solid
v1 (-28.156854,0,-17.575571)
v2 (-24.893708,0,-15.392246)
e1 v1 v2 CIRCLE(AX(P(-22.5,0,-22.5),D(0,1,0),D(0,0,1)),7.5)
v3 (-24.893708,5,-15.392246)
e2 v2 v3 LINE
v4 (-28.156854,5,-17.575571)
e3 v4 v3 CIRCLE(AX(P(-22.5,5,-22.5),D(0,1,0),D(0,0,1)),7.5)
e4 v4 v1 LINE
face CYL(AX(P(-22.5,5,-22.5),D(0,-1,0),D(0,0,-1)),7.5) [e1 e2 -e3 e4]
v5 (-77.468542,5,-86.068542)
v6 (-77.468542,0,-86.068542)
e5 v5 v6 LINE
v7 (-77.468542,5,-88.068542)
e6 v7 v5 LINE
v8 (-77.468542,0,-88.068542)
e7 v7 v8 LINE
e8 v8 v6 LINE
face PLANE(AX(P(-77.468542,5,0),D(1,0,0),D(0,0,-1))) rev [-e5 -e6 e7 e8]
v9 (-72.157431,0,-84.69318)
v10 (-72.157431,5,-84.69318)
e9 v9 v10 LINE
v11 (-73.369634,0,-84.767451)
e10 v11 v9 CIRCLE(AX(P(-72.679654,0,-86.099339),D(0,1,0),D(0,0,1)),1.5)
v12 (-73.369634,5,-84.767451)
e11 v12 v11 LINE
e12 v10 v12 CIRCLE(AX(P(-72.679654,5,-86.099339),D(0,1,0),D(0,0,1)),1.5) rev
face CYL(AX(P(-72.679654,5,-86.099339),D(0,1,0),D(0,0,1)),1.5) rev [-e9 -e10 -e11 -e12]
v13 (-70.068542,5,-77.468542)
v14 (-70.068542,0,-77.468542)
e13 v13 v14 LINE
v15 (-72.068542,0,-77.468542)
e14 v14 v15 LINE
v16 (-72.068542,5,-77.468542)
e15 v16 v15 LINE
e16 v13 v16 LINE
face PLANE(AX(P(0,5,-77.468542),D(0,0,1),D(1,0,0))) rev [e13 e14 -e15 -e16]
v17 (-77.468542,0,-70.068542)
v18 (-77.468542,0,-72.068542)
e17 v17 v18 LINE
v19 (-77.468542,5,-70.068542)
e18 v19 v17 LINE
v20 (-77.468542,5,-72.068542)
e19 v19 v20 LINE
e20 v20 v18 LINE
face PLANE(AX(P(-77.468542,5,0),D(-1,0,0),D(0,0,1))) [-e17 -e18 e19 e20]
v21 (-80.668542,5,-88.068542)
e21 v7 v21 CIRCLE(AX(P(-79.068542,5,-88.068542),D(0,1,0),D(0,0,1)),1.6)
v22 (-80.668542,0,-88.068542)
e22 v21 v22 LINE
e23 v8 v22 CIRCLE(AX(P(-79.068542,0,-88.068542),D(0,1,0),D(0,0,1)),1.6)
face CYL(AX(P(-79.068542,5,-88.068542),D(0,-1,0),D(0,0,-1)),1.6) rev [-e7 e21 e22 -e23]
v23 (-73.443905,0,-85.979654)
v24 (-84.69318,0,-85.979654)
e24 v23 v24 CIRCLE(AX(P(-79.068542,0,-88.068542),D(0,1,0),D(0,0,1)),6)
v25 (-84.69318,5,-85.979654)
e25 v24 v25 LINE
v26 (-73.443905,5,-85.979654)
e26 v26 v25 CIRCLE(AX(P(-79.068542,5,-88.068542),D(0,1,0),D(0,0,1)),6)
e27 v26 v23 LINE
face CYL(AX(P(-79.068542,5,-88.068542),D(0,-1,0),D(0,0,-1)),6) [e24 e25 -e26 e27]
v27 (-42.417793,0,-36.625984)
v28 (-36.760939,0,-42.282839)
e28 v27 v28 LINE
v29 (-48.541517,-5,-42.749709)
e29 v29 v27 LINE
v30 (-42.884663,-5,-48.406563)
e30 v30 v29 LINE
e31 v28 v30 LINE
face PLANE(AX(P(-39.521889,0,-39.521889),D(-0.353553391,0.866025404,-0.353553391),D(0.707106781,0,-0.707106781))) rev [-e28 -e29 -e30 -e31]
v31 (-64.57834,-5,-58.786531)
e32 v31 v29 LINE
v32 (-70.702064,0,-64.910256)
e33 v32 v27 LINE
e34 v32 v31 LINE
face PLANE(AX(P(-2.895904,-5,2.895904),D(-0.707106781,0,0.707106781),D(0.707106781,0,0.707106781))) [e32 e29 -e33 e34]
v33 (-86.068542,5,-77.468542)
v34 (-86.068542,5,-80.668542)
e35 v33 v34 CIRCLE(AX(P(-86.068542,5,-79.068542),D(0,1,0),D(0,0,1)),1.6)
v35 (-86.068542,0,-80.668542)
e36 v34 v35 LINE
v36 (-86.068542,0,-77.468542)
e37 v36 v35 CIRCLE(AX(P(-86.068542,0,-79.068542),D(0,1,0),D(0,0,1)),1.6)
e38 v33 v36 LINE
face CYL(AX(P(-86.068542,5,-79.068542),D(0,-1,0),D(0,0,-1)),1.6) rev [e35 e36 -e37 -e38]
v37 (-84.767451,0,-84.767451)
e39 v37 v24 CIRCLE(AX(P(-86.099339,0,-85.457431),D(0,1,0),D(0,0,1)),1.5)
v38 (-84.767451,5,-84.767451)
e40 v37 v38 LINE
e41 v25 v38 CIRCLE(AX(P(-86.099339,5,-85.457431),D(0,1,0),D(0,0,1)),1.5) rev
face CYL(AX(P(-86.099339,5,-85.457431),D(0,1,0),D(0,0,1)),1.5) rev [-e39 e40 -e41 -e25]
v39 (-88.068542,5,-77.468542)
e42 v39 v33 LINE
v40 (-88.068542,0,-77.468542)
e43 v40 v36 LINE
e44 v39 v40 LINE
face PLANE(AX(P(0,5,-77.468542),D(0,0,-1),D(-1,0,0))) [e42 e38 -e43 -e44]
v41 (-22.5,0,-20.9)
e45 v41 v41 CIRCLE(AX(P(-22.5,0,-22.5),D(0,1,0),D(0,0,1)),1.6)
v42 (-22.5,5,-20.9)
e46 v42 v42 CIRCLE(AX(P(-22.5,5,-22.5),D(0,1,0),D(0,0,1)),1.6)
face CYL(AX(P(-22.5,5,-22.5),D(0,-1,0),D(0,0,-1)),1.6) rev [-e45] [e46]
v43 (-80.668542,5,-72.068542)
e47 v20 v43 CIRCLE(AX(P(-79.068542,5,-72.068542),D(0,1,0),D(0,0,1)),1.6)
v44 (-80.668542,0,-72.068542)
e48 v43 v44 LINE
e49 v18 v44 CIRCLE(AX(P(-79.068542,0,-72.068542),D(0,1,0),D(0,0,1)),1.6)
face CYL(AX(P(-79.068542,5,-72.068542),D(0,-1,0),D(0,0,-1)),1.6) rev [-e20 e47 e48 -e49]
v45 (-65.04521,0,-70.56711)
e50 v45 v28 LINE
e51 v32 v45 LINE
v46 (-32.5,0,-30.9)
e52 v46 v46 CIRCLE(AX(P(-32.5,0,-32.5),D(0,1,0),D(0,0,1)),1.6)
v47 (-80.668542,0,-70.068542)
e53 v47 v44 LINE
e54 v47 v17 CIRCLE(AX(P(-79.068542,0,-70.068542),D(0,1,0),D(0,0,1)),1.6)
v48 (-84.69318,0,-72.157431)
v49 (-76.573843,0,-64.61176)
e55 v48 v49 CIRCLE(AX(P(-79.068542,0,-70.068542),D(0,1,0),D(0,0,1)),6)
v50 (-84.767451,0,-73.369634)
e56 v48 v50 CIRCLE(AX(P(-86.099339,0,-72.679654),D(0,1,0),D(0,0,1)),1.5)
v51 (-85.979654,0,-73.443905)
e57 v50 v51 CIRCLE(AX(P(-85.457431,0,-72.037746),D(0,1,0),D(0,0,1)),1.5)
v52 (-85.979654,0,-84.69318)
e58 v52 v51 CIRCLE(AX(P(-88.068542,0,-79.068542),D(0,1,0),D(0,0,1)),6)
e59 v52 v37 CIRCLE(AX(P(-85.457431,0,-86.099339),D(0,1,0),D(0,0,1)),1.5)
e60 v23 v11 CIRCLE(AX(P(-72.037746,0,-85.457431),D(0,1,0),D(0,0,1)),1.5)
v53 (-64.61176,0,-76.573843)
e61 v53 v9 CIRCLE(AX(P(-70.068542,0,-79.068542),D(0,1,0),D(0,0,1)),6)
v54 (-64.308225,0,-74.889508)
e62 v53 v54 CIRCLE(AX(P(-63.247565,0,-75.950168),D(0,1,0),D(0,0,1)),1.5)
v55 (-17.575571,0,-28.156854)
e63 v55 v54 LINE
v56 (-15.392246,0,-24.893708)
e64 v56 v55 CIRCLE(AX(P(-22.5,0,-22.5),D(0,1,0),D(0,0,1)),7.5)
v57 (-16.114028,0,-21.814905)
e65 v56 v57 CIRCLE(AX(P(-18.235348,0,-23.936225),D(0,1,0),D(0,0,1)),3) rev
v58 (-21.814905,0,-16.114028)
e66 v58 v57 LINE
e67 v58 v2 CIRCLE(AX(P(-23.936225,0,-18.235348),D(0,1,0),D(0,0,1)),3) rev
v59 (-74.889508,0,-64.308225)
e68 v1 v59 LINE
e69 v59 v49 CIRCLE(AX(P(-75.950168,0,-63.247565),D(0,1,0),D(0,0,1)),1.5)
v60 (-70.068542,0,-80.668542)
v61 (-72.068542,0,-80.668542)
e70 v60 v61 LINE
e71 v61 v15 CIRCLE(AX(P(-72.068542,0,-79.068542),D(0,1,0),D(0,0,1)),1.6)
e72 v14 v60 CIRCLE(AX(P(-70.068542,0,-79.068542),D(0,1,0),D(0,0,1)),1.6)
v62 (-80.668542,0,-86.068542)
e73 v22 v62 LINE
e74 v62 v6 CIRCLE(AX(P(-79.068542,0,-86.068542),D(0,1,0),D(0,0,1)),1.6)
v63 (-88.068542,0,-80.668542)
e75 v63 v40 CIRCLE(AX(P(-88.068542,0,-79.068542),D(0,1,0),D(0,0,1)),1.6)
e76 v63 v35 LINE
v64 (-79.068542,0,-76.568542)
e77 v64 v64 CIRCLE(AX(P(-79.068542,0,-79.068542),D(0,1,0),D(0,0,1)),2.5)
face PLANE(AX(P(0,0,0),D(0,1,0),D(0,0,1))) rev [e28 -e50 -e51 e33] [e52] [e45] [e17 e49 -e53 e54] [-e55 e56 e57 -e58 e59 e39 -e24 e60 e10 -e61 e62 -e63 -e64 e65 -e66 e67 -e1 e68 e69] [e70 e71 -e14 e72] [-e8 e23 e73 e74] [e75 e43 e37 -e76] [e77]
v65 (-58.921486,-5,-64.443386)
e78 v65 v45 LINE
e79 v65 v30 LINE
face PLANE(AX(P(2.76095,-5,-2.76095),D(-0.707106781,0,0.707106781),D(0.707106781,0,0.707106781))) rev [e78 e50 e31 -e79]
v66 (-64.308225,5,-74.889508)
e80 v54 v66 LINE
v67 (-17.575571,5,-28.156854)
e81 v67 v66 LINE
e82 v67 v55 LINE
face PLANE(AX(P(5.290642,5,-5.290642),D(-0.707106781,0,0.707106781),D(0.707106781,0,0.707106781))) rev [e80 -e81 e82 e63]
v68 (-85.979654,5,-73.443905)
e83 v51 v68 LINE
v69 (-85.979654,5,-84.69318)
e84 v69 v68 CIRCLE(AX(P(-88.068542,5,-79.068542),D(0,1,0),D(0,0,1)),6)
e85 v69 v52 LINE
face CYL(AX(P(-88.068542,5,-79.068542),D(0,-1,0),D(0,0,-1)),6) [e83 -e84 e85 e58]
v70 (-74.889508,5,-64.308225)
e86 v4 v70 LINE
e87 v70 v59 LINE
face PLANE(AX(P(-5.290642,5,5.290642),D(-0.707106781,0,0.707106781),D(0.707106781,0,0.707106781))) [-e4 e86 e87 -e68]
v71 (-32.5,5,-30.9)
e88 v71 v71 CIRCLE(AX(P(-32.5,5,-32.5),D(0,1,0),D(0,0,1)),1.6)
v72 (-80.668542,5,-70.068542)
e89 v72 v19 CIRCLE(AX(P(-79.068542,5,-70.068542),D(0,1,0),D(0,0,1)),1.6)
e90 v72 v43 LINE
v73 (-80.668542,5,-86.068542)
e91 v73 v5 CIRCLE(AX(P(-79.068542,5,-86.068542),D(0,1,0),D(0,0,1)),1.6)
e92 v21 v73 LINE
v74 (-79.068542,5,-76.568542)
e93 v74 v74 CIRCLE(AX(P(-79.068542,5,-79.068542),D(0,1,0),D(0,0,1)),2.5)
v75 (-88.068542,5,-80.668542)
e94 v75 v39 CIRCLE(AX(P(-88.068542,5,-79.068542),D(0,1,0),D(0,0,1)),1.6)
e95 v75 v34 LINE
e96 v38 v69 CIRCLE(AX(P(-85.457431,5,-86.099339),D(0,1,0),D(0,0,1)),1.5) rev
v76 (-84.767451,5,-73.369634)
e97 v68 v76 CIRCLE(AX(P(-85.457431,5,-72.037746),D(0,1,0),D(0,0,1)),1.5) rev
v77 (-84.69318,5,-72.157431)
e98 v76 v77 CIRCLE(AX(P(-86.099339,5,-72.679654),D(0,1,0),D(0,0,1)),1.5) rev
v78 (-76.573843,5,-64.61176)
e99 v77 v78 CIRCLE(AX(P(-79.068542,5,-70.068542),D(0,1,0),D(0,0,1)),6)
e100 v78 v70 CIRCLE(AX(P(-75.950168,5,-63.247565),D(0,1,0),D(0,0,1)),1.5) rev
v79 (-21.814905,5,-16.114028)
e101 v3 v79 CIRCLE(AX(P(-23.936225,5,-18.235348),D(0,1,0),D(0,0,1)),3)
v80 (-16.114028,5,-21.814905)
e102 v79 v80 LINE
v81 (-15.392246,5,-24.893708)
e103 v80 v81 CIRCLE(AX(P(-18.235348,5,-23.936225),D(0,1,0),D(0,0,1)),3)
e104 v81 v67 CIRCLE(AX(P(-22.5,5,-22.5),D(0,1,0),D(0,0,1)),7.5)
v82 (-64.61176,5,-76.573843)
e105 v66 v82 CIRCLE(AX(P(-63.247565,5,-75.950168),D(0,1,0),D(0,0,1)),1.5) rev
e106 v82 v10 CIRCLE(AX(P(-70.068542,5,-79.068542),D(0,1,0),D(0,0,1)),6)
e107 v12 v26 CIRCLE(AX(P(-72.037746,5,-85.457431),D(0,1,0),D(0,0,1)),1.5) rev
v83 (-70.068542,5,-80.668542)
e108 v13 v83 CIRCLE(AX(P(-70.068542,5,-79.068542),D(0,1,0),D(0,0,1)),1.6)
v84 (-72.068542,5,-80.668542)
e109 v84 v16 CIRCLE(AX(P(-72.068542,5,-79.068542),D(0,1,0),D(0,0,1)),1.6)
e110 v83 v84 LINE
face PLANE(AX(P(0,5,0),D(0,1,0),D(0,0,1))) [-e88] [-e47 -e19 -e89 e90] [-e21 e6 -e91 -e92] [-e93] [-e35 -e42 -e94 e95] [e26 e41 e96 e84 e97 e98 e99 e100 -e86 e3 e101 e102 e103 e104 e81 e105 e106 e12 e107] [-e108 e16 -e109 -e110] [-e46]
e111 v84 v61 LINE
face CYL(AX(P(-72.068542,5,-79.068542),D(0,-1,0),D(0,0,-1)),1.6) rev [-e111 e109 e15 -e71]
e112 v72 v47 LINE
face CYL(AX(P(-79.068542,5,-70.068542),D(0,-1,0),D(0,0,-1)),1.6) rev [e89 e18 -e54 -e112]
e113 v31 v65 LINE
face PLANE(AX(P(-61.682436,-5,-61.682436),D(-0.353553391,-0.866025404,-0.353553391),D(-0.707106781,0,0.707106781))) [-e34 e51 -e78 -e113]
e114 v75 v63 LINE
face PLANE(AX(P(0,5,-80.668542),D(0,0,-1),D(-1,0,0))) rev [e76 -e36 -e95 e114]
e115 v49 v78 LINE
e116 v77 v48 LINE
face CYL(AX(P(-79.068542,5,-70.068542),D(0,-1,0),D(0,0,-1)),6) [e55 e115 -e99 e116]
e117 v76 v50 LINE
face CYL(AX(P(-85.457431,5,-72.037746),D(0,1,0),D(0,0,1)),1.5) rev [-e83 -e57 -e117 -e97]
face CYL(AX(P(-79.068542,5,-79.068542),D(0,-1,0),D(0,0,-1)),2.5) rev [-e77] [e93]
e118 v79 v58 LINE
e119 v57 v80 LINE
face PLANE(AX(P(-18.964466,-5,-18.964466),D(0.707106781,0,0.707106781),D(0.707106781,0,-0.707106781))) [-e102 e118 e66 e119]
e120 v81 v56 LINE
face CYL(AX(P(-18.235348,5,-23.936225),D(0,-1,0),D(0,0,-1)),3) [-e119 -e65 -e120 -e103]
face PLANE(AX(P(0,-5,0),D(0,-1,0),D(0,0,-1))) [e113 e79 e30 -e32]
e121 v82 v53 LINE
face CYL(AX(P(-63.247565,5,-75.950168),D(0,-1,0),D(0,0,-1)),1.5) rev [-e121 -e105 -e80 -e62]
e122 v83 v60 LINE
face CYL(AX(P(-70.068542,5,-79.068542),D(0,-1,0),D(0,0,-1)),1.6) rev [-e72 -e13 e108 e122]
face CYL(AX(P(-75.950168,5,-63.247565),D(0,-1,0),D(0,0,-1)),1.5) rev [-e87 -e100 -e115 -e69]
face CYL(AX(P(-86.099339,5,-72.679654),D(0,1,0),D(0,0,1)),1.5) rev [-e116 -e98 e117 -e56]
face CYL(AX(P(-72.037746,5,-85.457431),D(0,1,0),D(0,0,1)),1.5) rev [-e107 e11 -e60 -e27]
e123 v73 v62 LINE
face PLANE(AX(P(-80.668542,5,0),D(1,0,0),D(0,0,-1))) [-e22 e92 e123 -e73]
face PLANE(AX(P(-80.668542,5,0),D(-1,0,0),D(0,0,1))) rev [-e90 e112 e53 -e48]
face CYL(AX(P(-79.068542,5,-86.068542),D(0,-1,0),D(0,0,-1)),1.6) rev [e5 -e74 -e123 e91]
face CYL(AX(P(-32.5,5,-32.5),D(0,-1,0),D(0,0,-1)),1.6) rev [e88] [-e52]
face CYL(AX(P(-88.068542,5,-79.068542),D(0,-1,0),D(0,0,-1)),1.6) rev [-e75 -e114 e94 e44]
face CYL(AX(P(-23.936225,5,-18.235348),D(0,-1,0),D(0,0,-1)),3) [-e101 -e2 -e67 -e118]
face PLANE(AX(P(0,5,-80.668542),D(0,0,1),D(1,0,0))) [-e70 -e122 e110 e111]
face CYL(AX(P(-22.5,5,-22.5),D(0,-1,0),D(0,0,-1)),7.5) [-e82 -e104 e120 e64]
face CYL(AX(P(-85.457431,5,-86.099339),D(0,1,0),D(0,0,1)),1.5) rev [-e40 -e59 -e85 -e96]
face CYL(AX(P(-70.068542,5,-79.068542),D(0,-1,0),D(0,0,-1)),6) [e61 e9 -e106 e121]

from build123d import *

# Parameters (mm, degrees)
SKETCH1_R           = 1.6
SKETCH1_R_2         = 2.5
BOSS_EXTRUDE1_DEPTH = 5
FILLET1_R           = 1.5
CUT_EXTRUDE1_START  = -10
CUT_EXTRUDE1_DEPTH  = 10
FILLET2_R           = 3
BOSS_EXTRUDE2_DEPTH = 5
CHAMFER1_SIZE2      = 8.660254038
CHAMFER1_SIZE       = 5
CHAMFER2_SIZE2      = 5
CHAMFER2_SIZE       = 8.660254038


# Some blends are built 0.0001 mm under size
with BuildPart() as part:
    # Sketch1 → Boss-Extrude1 (new body)
    with BuildSketch(Plane(origin=(0, 0, 0), x_dir=(1, 0, 0), z_dir=(0, 1, 0))):
        with BuildLine():
            ThreePointArc((-85.12409805, 73.840708631), (-84.725396744, 73.411688245), (-84.296376359, 73.012986939))
            ThreePointArc((-84.296376359, 73.012986939), (-83.127079594, 65.649461526), (-75.690864757, 65.109581606))
            Line((-75.690864757, 65.109581606), (-28.156854249, 17.575571099))
            ThreePointArc((-28.156854249, 17.575571099), (-17.196699141, 17.196699141), (-17.575571099, 28.156854249))
            Line((-17.575571099, 28.156854249), (-65.109581606, 75.690864757))
            ThreePointArc((-65.109581606, 75.690864757), (-65.649461526, 83.127079594), (-73.012986939, 84.296376359))
            ThreePointArc((-73.012986939, 84.296376359), (-73.411688245, 84.725396744), (-73.840708631, 85.12409805))
            ThreePointArc((-73.840708631, 85.12409805), (-79.068542495, 94.068542495), (-84.296376359, 85.12409805))
            ThreePointArc((-84.296376359, 85.12409805), (-84.725396744, 84.725396744), (-85.12409805, 84.296376359))
            ThreePointArc((-85.12409805, 84.296376359), (-94.068542495, 79.068542495), (-85.12409805, 73.840708631))
        make_face()
        with BuildLine():
            Line((-80.668542495, 86.068542495), (-80.668542495, 88.068542495))
            ThreePointArc((-80.668542495, 88.068542495), (-79.068542495, 89.668542495), (-77.468542495, 88.068542495))
            Line((-77.468542495, 88.068542495), (-77.468542495, 86.068542495))
            ThreePointArc((-77.468542495, 86.068542495), (-79.068542495, 84.468542495), (-80.668542495, 86.068542495))
        make_face(mode=Mode.SUBTRACT)
        with Locations(Location((-22.5, 22.5, 0), (0, 0, 270))):
            Circle(SKETCH1_R, mode=Mode.SUBTRACT)
        with Locations(Location((-32.5, 32.5, 0), (0, 0, 270))):
            Circle(SKETCH1_R, mode=Mode.SUBTRACT)
        with BuildLine():
            Line((-80.668542495, 70.068542495), (-80.668542495, 72.068542495))
            ThreePointArc((-80.668542495, 72.068542495), (-79.068542495, 73.668542495), (-77.468542495, 72.068542495))
            Line((-77.468542495, 72.068542495), (-77.468542495, 70.068542495))
            ThreePointArc((-77.468542495, 70.068542495), (-79.068542495, 68.468542495), (-80.668542495, 70.068542495))
        make_face(mode=Mode.SUBTRACT)
        with BuildLine():
            Line((-86.068542495, 77.468542495), (-88.068542495, 77.468542495))
            ThreePointArc((-88.068542495, 77.468542495), (-89.668542495, 79.068542495), (-88.068542495, 80.668542495))
            Line((-88.068542495, 80.668542495), (-86.068542495, 80.668542495))
            ThreePointArc((-86.068542495, 80.668542495), (-84.468542495, 79.068542495), (-86.068542495, 77.468542495))
        make_face(mode=Mode.SUBTRACT)
        with Locations(Location((-79.068542495, 79.068542495, 0), (0, 0, 270))):
            Circle(SKETCH1_R_2, mode=Mode.SUBTRACT)
        with BuildLine():
            ThreePointArc((-70.068542495, 80.668542495), (-68.468542495, 79.068542495), (-70.068542495, 77.468542495))
            Line((-70.068542495, 77.468542495), (-72.068542495, 77.468542495))
            ThreePointArc((-72.068542495, 77.468542495), (-73.668542495, 79.068542495), (-72.068542495, 80.668542495))
            Line((-72.068542495, 80.668542495), (-70.068542495, 80.668542495))
        make_face(mode=Mode.SUBTRACT)
    extrude(amount=BOSS_EXTRUDE1_DEPTH)

    # Fillet1
    # the kernel refuses this fillet: 1.5 mm, written as the material it adds along each edge
    with BuildSketch(Plane(origin=(-75.690864757, 0, -65.109581606), x_dir=(-0.8710919006324759, 0, 0.4911200470887958), z_dir=(0, 1, 0))) as fillet1_piece_1:
        with BuildLine():
            CenterArc((1.140350885, 1.494638979), FILLET1_R, 195.585774364, 69.56865207)
            Line((-0.304493073, 1.091617967), (0, 0))
            ThreePointArc((0, 0), (0.506822616, 0.021444084), (1.013645231, 0))
        make_face()
    extrude(amount=5)
    with BuildSketch(Plane(origin=(-65.109581606, 0, -75.690864757), x_dir=(0.70710678118656, 0, 0.7071067811865349), z_dir=(0, 1, 0))) as fillet1_piece_2:
        with BuildLine():
            CenterArc((1.133289821, 1.5), FILLET1_R, 200.43134793, 69.56865207)
            ThreePointArc((-0.272346884, 0.976372792), (-0.115517872, 0.493948007), (0, 0))
            Line((0, 0), (1.133289821, 0))
        make_face()
    extrude(amount=5)
    with BuildSketch(Plane(origin=(-84.296376359, 0, -85.12409805), x_dir=(-0.7160400781456726, 0, 0.6980591711947771), z_dir=(0, 1, 0))) as fillet1_piece_3:
        with BuildLine():
            CenterArc((1.058307083, -1.497254596), FILLET1_R, 93.467060005, 62.635531643)
            ThreePointArc((-0.313101337, -0.889604248), (-0.139044818, -0.450963409), (0, 0))
            ThreePointArc((0, 0), (0.483797523, -0.014642152), (0.967595047, 0))
        make_face()
    extrude(amount=5)
    with BuildSketch(Plane(origin=(-73.840708631, 0, -85.12409805), x_dir=(0.7160400781456655, 0, 0.6980591711947844), z_dir=(0, 1, 0)), Plane(origin=(-85.12409805, 0, -84.296376359), x_dir=(0.698059171194804, 0, -0.7160400781456464), z_dir=(0, 1, 0)), Plane(origin=(-84.296376359, 0, -73.012986939), x_dir=(-0.716040078145762, 0, -0.6980591711946854), z_dir=(0, 1, 0))) as fillet1_piece_4:
        with BuildLine():
            CenterArc((1.058307083, 1.497254596), FILLET1_R, 203.897408353, 62.635531643)
            ThreePointArc((-0.313101337, 0.889604248), (-0.139044818, 0.450963409), (0, 0))
            ThreePointArc((0, 0), (0.483797523, 0.014642152), (0.967595047, 0))
        make_face()
    extrude(amount=5)
    with BuildSketch(Plane(origin=(-73.012986939, 0, -84.296376359), x_dir=(0.9071785576189849, 0, -0.42074584323120545), z_dir=(0, 1, 0)), Plane(origin=(-85.12409805, 0, -73.840708631), x_dir=(-0.9071785576191526, 0, 0.4207458432308441), z_dir=(0, 1, 0))) as fillet1_piece_5:
        with BuildLine():
            CenterArc((1.060981867, 1.495360386), FILLET1_R, 202.856873055, 62.635531643)
            ThreePointArc((-0.321235194, 0.912714701), (-0.146805923, 0.461218449), (0, 0))
            ThreePointArc((0, 0), (0.471547497, 0.018558455), (0.943094993, 0))
        make_face()
    extrude(amount=5)

    # Sketch4 → Cut-Extrude1 (cut)
    with BuildSketch(Plane(origin=(0, 5, 0), x_dir=(1, 0, 0), z_dir=(0, 1, 0)).offset(CUT_EXTRUDE1_START)):
        with BuildLine():
            Line((-15.011619019, 22.917313169), (-18.964466094, 18.964466094))
            Line((-18.964466094, 18.964466094), (-17.196699141, 17.196699141))
            ThreePointArc((-17.196699141, 17.196699141), (-15.493707308, 19.823834327), (-15.011619019, 22.917313169))
        make_face()
        with BuildLine():
            Line((-17.196699141, 17.196699141), (-18.964466094, 18.964466094))
            Line((-18.964466094, 18.964466094), (-22.917313169, 15.011619019))
            ThreePointArc((-22.917313169, 15.011619019), (-19.823834327, 15.493707308), (-17.196699141, 17.196699141))
        make_face()
    extrude(amount=CUT_EXTRUDE1_DEPTH, mode=Mode.SUBTRACT)

    # Fillet2
    fillet2_edges = [part.edges().sort_by_distance(p)[0] for p in [
        (-22.917313169, 2.5, -15.011619019),
        (-15.011619019, 2.5, -22.917313169),
    ]]
    fillet(fillet2_edges, radius=FILLET2_R)

    # Sketch5 → Boss-Extrude2 (add)
    with BuildSketch(Plane.XZ):
        Polygon((-70.70206426, -64.910255721), (-67.806159991, -67.806159991), (-39.521888743, -39.521888743), (-42.417793012, -36.625984474), align=None)
        Polygon((-39.521888743, -39.521888743), (-67.806159991, -67.806159991), (-65.04521001, -70.567109971), (-36.760938763, -42.282838723), align=None)
    extrude(amount=BOSS_EXTRUDE2_DEPTH)

    # Chamfer1
    chamfer1_edges = [part.edges().sort_by_distance(p)[0] for p in [
        (-67.873637135, -5, -67.738682846),
    ]]
    chamfer1_side = [part.faces().sort_by_distance(p)[0] for p in [
        (-67.873637135, -4.9, -67.738682846),
    ]]
    chamfer(chamfer1_edges, length=CHAMFER1_SIZE - 0.0001, length2=CHAMFER1_SIZE2 - 0.0001, reference=chamfer1_side[0])  # a hair under: the kernel refuses the full size

    # Chamfer2
    chamfer2_edges = [part.edges().sort_by_distance(p)[0] for p in [
        (-39.589365887, -5, -39.454411599),
    ]]
    chamfer2_side = [part.faces().sort_by_distance(p)[0] for p in [
        (-39.660076566, -5, -39.525122277),
    ]]
    chamfer(chamfer2_edges, length=CHAMFER2_SIZE - 0.0001, length2=CHAMFER2_SIZE2 - 0.0001, reference=chamfer2_side[0])  # a hair under: the kernel refuses the full size


solid = part.part
